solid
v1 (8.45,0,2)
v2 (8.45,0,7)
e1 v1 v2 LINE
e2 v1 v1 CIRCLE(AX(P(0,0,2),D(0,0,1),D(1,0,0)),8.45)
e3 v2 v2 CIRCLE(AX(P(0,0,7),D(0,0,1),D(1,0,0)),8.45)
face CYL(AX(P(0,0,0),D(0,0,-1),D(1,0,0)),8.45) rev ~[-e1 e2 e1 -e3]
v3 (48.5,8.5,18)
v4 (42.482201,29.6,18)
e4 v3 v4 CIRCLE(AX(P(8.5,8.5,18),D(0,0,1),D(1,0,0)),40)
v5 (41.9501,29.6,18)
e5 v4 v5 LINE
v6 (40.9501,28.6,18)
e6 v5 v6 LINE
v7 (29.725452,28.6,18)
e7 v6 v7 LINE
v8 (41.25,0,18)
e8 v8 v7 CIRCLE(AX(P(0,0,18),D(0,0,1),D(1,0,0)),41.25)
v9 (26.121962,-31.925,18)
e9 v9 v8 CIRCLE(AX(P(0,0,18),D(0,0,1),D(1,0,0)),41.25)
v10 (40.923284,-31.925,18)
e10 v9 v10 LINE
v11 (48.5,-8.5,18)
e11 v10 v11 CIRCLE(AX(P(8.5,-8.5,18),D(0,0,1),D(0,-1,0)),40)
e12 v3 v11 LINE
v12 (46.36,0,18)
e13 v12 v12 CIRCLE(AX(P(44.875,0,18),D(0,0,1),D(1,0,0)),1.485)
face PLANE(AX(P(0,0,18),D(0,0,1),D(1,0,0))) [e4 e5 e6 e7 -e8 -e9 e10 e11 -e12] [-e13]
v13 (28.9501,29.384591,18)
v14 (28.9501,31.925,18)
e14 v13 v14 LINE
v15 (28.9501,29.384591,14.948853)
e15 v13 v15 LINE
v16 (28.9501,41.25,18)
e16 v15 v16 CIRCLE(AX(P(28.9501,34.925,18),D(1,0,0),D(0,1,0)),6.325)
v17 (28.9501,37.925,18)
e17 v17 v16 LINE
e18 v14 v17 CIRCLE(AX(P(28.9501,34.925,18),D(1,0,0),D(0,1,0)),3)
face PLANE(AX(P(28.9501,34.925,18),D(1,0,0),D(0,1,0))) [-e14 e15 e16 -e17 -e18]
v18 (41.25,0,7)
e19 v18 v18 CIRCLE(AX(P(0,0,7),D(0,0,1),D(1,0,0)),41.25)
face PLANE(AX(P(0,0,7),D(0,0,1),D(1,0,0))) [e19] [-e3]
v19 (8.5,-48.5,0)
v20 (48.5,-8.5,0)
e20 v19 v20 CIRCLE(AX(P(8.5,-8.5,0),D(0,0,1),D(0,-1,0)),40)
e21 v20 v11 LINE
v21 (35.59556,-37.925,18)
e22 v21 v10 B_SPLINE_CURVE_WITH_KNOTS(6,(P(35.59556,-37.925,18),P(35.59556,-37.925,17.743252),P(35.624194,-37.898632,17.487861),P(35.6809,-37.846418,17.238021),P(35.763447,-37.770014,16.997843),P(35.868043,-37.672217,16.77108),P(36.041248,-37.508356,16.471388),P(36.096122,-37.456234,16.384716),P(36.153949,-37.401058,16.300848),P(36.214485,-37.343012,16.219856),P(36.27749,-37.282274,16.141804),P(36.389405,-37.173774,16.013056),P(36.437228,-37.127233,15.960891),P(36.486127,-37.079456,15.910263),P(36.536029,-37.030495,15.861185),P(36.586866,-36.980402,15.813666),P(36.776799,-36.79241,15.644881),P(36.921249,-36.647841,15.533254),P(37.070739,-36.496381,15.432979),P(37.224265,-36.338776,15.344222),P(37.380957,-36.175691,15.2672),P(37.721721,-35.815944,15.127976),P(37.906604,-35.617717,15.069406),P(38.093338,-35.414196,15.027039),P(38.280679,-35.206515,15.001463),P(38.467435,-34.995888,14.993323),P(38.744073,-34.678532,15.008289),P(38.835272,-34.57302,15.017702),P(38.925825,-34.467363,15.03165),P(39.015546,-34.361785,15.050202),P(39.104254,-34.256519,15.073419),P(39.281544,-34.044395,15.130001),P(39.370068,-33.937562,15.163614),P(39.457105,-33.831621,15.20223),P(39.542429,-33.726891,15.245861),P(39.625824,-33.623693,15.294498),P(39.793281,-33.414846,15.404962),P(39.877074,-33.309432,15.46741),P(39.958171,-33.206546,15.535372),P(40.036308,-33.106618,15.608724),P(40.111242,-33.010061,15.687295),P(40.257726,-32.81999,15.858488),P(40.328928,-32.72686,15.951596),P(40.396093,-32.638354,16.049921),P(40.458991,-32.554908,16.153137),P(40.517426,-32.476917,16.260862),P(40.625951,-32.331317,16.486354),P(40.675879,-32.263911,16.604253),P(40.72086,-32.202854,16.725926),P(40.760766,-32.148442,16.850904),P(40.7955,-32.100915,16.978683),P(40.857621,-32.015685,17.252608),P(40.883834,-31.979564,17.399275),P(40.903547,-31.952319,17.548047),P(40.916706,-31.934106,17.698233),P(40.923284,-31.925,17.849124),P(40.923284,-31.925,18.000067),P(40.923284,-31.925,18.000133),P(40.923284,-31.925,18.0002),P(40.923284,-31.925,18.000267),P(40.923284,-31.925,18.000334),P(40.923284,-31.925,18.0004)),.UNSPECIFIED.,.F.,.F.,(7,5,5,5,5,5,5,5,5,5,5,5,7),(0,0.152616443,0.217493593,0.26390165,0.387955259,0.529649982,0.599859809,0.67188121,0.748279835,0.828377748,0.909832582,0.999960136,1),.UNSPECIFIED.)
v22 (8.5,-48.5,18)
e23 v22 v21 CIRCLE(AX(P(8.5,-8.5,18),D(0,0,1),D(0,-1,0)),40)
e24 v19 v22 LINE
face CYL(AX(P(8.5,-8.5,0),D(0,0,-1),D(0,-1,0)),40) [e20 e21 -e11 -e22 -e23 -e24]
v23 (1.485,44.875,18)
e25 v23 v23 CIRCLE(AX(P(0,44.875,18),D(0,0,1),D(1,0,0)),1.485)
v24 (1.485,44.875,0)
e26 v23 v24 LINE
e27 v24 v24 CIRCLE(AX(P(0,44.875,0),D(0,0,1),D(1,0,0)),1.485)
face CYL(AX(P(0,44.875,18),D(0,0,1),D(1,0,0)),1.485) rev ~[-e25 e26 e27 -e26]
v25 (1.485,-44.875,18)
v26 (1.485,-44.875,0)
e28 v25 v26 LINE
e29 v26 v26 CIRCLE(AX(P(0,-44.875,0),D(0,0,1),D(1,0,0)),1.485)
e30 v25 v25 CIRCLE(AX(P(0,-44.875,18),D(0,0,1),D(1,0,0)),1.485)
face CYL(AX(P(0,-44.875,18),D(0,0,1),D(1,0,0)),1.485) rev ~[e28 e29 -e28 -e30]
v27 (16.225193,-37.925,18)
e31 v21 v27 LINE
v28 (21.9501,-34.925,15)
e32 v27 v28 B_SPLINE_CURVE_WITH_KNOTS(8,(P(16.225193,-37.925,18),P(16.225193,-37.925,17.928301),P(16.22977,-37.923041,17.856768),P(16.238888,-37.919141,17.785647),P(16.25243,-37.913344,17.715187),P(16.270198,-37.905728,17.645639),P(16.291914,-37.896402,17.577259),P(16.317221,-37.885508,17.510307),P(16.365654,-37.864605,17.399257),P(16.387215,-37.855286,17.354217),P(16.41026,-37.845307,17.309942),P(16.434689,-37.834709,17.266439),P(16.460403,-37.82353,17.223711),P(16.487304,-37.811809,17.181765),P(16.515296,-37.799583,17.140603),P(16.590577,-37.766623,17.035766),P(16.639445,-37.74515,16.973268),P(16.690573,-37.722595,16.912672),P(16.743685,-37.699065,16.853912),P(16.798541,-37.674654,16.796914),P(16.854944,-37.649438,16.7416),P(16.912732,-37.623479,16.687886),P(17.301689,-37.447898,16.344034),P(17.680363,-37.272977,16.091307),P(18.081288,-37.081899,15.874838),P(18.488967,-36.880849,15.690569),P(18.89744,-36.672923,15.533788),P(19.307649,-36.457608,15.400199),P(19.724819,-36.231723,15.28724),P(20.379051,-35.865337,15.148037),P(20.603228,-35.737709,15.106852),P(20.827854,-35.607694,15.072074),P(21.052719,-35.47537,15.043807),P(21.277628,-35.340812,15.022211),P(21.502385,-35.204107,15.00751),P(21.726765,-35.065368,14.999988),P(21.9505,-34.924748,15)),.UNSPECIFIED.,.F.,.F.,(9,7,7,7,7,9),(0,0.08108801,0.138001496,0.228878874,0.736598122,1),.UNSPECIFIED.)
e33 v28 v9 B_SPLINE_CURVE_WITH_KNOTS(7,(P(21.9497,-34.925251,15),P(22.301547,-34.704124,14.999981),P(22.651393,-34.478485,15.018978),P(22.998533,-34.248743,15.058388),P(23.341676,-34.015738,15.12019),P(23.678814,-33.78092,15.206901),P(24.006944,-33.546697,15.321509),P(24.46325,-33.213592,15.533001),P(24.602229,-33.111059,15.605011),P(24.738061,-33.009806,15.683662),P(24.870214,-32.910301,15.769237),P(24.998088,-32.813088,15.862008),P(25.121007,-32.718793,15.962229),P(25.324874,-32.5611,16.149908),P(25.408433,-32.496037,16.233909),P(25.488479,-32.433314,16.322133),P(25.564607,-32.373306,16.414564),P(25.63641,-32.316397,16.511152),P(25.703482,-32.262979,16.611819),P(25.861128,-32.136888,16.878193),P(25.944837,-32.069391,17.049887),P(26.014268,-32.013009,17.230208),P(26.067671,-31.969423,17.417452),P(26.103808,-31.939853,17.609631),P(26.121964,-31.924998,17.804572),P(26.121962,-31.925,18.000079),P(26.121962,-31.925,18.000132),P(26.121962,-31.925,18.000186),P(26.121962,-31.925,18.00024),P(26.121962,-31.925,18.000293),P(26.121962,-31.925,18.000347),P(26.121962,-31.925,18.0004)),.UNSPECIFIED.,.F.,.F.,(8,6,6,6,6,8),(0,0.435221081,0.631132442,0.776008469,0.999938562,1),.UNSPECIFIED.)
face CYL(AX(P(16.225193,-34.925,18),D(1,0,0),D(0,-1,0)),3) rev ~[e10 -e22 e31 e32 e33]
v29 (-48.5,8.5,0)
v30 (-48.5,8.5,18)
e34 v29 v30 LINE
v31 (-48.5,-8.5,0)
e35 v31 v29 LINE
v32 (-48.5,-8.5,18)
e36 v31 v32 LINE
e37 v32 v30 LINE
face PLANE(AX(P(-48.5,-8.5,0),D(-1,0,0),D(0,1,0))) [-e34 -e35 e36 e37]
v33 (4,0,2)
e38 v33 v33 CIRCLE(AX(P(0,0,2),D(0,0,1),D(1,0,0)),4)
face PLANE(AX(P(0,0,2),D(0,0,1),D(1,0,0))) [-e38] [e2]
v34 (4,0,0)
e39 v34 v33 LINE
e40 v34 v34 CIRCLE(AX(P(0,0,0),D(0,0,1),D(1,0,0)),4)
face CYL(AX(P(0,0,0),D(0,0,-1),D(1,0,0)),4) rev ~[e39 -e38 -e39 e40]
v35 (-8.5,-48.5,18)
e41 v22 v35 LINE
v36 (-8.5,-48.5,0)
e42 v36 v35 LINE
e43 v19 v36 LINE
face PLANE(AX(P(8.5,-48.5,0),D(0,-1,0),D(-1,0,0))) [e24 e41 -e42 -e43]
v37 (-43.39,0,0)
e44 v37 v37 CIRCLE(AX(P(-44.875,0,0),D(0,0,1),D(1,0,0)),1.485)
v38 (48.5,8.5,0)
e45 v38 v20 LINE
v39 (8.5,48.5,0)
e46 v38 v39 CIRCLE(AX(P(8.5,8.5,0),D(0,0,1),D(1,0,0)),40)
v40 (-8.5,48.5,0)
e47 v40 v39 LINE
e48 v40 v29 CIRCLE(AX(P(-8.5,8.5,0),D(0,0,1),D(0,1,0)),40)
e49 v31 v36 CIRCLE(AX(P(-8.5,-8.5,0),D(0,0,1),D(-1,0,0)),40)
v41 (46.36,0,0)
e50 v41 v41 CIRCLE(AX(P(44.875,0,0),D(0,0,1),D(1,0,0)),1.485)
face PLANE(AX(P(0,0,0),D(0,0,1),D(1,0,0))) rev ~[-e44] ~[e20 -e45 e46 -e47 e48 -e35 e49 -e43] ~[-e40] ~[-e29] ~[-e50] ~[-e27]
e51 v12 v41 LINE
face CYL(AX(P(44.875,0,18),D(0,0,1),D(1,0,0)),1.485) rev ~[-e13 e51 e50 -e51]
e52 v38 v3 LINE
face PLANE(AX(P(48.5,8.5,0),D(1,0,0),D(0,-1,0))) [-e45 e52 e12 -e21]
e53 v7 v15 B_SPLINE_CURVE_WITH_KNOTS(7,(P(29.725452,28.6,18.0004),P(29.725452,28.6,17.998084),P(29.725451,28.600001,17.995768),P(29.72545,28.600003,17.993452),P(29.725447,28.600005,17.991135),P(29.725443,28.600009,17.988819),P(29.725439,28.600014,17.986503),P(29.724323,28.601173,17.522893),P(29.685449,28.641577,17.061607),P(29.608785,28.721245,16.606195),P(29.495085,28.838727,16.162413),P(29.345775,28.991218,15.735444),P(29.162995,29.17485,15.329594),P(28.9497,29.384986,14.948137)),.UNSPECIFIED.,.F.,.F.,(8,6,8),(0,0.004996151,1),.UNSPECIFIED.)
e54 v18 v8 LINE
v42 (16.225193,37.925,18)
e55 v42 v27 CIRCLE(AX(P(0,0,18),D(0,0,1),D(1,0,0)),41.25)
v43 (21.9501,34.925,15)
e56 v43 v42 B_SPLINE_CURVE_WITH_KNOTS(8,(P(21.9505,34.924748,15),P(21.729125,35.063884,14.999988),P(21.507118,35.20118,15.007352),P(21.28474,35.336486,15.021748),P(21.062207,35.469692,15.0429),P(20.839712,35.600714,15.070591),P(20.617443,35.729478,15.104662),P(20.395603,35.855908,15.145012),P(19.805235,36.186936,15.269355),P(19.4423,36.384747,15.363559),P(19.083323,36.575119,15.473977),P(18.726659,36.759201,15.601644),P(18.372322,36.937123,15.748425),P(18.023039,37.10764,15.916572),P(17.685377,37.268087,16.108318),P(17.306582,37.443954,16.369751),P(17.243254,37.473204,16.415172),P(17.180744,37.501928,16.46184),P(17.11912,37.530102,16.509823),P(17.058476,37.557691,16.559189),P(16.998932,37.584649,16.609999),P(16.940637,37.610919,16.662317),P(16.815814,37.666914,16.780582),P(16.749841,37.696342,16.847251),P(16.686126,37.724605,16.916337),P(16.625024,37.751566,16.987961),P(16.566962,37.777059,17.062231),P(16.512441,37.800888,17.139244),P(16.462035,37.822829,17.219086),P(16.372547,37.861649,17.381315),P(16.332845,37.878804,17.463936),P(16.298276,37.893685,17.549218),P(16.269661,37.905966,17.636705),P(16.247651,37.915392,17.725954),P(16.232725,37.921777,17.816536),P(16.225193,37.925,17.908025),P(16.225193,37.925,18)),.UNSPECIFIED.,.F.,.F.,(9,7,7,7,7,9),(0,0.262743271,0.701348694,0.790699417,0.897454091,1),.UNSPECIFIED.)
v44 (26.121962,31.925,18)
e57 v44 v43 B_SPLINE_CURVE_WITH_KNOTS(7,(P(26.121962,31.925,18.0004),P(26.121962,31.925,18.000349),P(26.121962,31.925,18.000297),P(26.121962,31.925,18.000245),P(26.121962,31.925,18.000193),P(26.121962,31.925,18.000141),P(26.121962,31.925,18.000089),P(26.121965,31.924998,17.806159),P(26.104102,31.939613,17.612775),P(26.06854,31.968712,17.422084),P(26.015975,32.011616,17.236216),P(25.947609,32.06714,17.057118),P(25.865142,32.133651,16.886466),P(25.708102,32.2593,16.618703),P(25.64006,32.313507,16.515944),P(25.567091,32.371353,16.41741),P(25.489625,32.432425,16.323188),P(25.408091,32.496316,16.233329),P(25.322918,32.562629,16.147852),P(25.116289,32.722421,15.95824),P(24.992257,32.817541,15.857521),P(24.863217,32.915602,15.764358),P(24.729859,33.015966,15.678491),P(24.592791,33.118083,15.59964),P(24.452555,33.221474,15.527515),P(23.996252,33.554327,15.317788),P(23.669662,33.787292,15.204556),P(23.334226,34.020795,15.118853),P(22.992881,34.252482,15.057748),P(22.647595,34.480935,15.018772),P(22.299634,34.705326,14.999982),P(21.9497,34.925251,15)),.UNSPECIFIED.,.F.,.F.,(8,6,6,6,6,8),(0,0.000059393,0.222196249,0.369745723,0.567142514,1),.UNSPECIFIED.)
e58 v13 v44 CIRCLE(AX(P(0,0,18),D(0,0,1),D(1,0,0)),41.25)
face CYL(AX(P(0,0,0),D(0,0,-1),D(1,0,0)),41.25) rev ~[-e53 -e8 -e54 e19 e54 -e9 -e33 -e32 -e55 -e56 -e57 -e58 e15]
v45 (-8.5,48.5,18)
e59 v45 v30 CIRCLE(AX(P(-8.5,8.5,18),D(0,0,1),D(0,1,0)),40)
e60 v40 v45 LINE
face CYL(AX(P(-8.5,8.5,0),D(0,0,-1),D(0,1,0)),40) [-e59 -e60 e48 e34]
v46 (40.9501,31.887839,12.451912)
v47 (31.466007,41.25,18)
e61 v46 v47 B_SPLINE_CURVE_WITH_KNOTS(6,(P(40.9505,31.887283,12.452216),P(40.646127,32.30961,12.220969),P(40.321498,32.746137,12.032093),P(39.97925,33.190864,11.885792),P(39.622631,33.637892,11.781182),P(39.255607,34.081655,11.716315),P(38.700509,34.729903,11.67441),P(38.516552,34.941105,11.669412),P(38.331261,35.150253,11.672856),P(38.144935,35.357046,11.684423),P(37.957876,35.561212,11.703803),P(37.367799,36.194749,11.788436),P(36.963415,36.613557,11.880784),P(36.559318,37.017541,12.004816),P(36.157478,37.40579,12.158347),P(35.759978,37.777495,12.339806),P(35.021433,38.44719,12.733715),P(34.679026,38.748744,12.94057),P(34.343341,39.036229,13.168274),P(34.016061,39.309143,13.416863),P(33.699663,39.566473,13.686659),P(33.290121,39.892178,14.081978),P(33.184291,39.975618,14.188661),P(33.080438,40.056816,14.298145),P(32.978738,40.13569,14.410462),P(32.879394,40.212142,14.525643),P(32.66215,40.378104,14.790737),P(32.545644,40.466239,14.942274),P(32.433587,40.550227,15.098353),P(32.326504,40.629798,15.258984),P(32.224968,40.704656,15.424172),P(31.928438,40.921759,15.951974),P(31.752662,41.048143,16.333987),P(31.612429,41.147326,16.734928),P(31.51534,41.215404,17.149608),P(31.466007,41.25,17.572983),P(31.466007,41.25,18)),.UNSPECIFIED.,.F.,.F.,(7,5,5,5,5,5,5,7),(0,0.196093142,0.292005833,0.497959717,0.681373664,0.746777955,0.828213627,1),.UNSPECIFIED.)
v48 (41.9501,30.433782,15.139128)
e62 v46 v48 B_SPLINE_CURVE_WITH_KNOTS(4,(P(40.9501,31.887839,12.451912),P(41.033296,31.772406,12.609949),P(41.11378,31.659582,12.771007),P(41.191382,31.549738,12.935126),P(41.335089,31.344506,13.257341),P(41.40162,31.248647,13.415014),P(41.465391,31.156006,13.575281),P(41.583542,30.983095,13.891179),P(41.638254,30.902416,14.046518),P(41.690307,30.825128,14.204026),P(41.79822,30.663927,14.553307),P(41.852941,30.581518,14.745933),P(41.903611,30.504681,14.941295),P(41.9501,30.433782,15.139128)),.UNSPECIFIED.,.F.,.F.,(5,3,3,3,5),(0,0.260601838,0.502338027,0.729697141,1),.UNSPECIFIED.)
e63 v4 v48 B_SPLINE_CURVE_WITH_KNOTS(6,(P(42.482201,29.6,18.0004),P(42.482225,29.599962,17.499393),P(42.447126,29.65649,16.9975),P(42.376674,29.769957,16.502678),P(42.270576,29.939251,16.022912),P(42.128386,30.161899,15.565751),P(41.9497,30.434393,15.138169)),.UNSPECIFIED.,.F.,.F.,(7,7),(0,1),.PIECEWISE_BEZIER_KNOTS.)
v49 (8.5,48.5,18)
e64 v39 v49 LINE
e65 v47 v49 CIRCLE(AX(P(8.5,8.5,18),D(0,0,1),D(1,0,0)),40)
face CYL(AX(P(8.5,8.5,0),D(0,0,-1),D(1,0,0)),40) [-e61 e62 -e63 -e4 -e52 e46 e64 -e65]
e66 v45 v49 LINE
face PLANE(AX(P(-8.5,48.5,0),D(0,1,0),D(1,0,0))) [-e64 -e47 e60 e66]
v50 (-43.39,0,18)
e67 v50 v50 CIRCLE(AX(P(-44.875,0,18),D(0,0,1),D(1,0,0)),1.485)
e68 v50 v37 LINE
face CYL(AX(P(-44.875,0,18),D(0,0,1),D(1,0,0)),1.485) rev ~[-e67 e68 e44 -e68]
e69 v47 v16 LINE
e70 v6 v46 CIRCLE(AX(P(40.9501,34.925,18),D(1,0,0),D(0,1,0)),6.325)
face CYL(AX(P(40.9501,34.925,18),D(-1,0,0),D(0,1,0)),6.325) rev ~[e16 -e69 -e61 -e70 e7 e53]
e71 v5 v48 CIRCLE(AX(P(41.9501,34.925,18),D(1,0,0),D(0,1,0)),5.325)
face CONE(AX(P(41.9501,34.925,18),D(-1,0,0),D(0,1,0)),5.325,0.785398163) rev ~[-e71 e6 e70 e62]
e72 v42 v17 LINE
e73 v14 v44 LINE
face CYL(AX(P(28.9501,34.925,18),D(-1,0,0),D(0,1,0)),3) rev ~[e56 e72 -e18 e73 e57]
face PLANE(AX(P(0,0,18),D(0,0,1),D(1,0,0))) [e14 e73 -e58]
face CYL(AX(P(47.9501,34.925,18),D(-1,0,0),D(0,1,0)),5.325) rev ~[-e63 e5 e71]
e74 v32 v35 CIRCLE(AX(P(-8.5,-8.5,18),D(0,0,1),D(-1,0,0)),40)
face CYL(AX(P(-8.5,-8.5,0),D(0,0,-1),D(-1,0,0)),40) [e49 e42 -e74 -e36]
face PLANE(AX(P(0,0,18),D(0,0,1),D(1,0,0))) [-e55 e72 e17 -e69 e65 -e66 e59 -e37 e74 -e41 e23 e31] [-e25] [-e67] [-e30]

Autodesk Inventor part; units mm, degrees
ref_plane "YZ Plane" through (0, 0, 0) normal (1, 0, 0) x (0, 1, 0)
ref_plane "XZ Plane" through (0, 0, 0) normal (0, 1, 0) x (-1, 0, 0)
ref_plane "XY Plane" through (0, 0, 0) normal (0, 0, 1) x (1, 0, 0)
sketch "Sketch1" plane through (0, 0, 0) normal (0, 0, 1) x (1, 0, 0)
  line L0 (-8.5, 48.5) -> (8.5, 48.5)
  line L1 (48.5, 8.5) -> (48.5, -8.5)
  line L2 (8.5, -48.5) -> (-8.5, -48.5)
  line L3 (-48.5, -8.5) -> (-48.5, 8.5)
  circle A0 centre (0, 0) radius 41.25
  circle A1 centre (0, 0) radius 8.45
  circle A2 centre (0, 0) radius 4
  arc A3 (48.5, 8.5) -> (8.5, 48.5) centre (8.5, 8.5) ccw
  arc A4 (8.5, -48.5) -> (48.5, -8.5) centre (8.5, -8.5) ccw
  arc A5 (-48.5, -8.5) -> (-8.5, -48.5) centre (-8.5, -8.5) ccw
  arc A6 (-8.5, 48.5) -> (-48.5, 8.5) centre (-8.5, 8.5) ccw
  point P0 (-48.5, 48.5)
  point P1 (48.5, -48.5)
  point P2 (48.5, 48.5)
  point P3 (-48.5, -48.5)
  point P4 (0, 48.5)
  point P5 (48.5, 0)
  dimension "d0" = 97
  dimension "d1" = 82.5
  dimension "d2" = 16.9
  dimension "d3" = 8
  dimension "d10" = 40
extrude "Extrusion1" add sketch "Sketch1" along normal blind 2 contours A1
extrude "Extrusion2" add sketch "Sketch1" along normal blind 7 contours A0
extrude "Extrusion3" add sketch "Sketch1" along normal blind 18 contours L0 A3 L1 A4 L2 A5 L3 A6
sketch "Sketch3" plane through (0, 0, 18) normal (0, 0, 1) x (1, 0, 0)
  circle A0 centre (0, 0) radius 41.25
  line L0 (21.9501, 34.925) -> (64.9501, 34.925)
  line L1 (41.9501, 40.25) -> (47.9501, 40.25)
  line L2 (49.9501, 42.25) -> (64.9501, 42.25)
  line L3 (40.9501, 41.25) -> (28.9501, 41.25)
  line L4 (49.9501, 42.25) -> (47.9501, 40.25)
  line L5 (40.9501, 41.25) -> (41.9501, 40.25)
  line L6 (47.9501, 40.25) -> (64.9501, 40.25) construction
  line L7 (41.9501, 40.25) -> (28.9501, 40.25) construction
  line L8 (64.9501, 42.25) -> (64.9501, 34.925)
  line L9 (28.9501, 37.925) -> (21.9501, 37.925)
  line L10 (28.9501, 37.925) -> (28.9501, 41.25)
  line L11 (21.9501, 37.925) -> (21.9501, 34.925) construction
  line L12 (21.9501, 34.925) -> (16.225193, 34.925)
  line L13 (21.9501, 37.925) -> (16.225193, 37.925)
  line L14 (16.225193, 34.925) -> (16.225193, 37.925)
  circle A1 centre (0, 0) radius 4
  line L15 (0, 0) -> (48.5, 0)
  line L16 (48.5, -8.5) -> (48.5, 8.5)
  line L17 (21.9501, -34.925) -> (64.9501, -34.925)
  line L18 (41.9501, -40.25) -> (47.9501, -40.25)
  line L19 (49.9501, -42.25) -> (64.9501, -42.25)
  line L20 (40.9501, -41.25) -> (28.9501, -41.25)
  line L21 (49.9501, -42.25) -> (47.9501, -40.25)
  line L22 (40.9501, -41.25) -> (41.9501, -40.25)
  line L23 (47.9501, -40.25) -> (64.9501, -40.25) construction
  line L24 (41.9501, -40.25) -> (28.9501, -40.25) construction
  line L25 (64.9501, -42.25) -> (64.9501, -34.925)
  line L26 (28.9501, -37.925) -> (21.9501, -37.925)
  line L27 (28.9501, -37.925) -> (28.9501, -41.25)
  line L28 (21.9501, -37.925) -> (21.9501, -34.925) construction
  line L29 (21.9501, -34.925) -> (16.225193, -34.925)
  line L30 (21.9501, -37.925) -> (16.225193, -37.925)
  line L31 (16.225193, -34.925) -> (16.225193, -37.925)
  line L32 (28.9501, -37.925) -> (64.9501, -37.925)
  point P0 (16.225193, -37.925)
  dimension "d12" = 10.65
  dimension "d13" = 14.65
  dimension "d14" = 12.65
  dimension "d15" = 45
  dimension "d16" = 45
  dimension "d17" = 15
  dimension "d18" = 6
  dimension "d19" = 12
  dimension "d21" = 7
  dimension "d22" = 6
sketch "Sketch3 outline for Revolution1" plane through (0, 0, 18) normal (0, 0, 1) x (1, 0, 0)
  line L0 (64.9501, 34.925) -> (64.9501, 42.25)
  line L1 (21.9501, 34.925) -> (64.9501, 34.925)
  arc A0 (16.225193, 37.925) -> (21.9501, 34.925) centre (0, 0) cw
  line L2 (21.9501, 37.925) -> (16.225193, 37.925)
  line L3 (28.9501, 37.925) -> (21.9501, 37.925)
  line L4 (28.9501, 41.25) -> (28.9501, 37.925)
  line L5 (40.9501, 41.25) -> (28.9501, 41.25)
  line L6 (41.9501, 40.25) -> (40.9501, 41.25)
  line L7 (47.9501, 40.25) -> (41.9501, 40.25)
  line L8 (49.9501, 42.25) -> (47.9501, 40.25)
  line L9 (64.9501, 42.25) -> (49.9501, 42.25)
revolve "Revolution1" cut sketch "Sketch3 outline for Revolution1" angle 360 about axis through (21.9501, 34.925, 18) along (1, 0, 0)
sketch "Sketch3 outline for Revolution2" plane through (0, 0, 18) normal (0, 0, 1) x (1, 0, 0)
  line L0 (21.9501, -37.925) -> (28.9501, -37.925)
  line L1 (16.225193, -37.925) -> (21.9501, -37.925)
  arc A0 (21.9501, -34.925) -> (16.225193, -37.925) centre (0, 0) cw
  line L2 (64.9501, -34.925) -> (21.9501, -34.925)
  line L3 (64.9501, -37.925) -> (64.9501, -34.925)
  line L4 (28.9501, -37.925) -> (64.9501, -37.925)
revolve "Revolution2" cut sketch "Sketch3 outline for Revolution2" angle 360 about axis through (21.9501, -34.925, 18) along (1, 0, 0)
sketch "Sketch4" plane through (0, 0, 18) normal (0, 0, 1) x (1, 0, 0)
  line L0 (35.59556, -37.925) -> (16.225193, -37.925) construction
  arc A0 (16.225193, 37.925) -> (16.225193, -37.925) centre (0, 0) ccw construction
  line L1 (16.225193, 37.925) -> (28.9501, 37.925) construction
  line L2 (28.9501, 37.925) -> (28.9501, 41.25) construction
  line L3 (28.9501, 41.25) -> (31.466007, 41.25) construction
  arc A1 (31.466007, 41.25) -> (8.5, 48.5) centre (8.5, 8.5) ccw construction
  line L4 (8.5, 48.5) -> (-8.5, 48.5) construction
  arc A2 (-8.5, 48.5) -> (-48.5, 8.5) centre (-8.5, 8.5) ccw construction
  line L5 (-48.5, 8.5) -> (-48.5, -8.5) construction
  arc A3 (-48.5, -8.5) -> (-8.5, -48.5) centre (-8.5, -8.5) ccw construction
  line L6 (-8.5, -48.5) -> (8.5, -48.5) construction
  arc A4 (8.5, -48.5) -> (35.59556, -37.925) centre (8.5, -8.5) ccw construction
  line L7 (26.121962, -31.925) -> (40.923284, -31.925) construction
  arc A5 (40.923284, -31.925) -> (48.5, -8.5) centre (8.5, -8.5) ccw construction
  line L8 (48.5, -8.5) -> (48.5, 8.5) construction
  arc A6 (48.5, 8.5) -> (42.482201, 29.6) centre (8.5, 8.5) ccw construction
  line L9 (42.482201, 29.6) -> (41.9501, 29.6) construction
  line L10 (41.9501, 29.6) -> (40.9501, 28.6) construction
  line L11 (40.9501, 28.6) -> (29.725452, 28.6) construction
  arc A7 (26.121962, -31.925) -> (29.725452, 28.6) centre (0, 0) ccw construction
  line L12 (-48.5, 0) -> (-41.25, 0) construction
  circle A8 centre (-44.875, 0) radius 1.485
  circle A9 centre (0, -44.875) radius 1.485
  circle A10 centre (44.875, 0) radius 1.485
  circle A11 centre (0, 44.875) radius 1.485
  dimension "d25" = 2.97
  dimension "d28" = 360
extrude "Extrusion4" cut sketch "Sketch4" against normal through all
properties part number "Case"
